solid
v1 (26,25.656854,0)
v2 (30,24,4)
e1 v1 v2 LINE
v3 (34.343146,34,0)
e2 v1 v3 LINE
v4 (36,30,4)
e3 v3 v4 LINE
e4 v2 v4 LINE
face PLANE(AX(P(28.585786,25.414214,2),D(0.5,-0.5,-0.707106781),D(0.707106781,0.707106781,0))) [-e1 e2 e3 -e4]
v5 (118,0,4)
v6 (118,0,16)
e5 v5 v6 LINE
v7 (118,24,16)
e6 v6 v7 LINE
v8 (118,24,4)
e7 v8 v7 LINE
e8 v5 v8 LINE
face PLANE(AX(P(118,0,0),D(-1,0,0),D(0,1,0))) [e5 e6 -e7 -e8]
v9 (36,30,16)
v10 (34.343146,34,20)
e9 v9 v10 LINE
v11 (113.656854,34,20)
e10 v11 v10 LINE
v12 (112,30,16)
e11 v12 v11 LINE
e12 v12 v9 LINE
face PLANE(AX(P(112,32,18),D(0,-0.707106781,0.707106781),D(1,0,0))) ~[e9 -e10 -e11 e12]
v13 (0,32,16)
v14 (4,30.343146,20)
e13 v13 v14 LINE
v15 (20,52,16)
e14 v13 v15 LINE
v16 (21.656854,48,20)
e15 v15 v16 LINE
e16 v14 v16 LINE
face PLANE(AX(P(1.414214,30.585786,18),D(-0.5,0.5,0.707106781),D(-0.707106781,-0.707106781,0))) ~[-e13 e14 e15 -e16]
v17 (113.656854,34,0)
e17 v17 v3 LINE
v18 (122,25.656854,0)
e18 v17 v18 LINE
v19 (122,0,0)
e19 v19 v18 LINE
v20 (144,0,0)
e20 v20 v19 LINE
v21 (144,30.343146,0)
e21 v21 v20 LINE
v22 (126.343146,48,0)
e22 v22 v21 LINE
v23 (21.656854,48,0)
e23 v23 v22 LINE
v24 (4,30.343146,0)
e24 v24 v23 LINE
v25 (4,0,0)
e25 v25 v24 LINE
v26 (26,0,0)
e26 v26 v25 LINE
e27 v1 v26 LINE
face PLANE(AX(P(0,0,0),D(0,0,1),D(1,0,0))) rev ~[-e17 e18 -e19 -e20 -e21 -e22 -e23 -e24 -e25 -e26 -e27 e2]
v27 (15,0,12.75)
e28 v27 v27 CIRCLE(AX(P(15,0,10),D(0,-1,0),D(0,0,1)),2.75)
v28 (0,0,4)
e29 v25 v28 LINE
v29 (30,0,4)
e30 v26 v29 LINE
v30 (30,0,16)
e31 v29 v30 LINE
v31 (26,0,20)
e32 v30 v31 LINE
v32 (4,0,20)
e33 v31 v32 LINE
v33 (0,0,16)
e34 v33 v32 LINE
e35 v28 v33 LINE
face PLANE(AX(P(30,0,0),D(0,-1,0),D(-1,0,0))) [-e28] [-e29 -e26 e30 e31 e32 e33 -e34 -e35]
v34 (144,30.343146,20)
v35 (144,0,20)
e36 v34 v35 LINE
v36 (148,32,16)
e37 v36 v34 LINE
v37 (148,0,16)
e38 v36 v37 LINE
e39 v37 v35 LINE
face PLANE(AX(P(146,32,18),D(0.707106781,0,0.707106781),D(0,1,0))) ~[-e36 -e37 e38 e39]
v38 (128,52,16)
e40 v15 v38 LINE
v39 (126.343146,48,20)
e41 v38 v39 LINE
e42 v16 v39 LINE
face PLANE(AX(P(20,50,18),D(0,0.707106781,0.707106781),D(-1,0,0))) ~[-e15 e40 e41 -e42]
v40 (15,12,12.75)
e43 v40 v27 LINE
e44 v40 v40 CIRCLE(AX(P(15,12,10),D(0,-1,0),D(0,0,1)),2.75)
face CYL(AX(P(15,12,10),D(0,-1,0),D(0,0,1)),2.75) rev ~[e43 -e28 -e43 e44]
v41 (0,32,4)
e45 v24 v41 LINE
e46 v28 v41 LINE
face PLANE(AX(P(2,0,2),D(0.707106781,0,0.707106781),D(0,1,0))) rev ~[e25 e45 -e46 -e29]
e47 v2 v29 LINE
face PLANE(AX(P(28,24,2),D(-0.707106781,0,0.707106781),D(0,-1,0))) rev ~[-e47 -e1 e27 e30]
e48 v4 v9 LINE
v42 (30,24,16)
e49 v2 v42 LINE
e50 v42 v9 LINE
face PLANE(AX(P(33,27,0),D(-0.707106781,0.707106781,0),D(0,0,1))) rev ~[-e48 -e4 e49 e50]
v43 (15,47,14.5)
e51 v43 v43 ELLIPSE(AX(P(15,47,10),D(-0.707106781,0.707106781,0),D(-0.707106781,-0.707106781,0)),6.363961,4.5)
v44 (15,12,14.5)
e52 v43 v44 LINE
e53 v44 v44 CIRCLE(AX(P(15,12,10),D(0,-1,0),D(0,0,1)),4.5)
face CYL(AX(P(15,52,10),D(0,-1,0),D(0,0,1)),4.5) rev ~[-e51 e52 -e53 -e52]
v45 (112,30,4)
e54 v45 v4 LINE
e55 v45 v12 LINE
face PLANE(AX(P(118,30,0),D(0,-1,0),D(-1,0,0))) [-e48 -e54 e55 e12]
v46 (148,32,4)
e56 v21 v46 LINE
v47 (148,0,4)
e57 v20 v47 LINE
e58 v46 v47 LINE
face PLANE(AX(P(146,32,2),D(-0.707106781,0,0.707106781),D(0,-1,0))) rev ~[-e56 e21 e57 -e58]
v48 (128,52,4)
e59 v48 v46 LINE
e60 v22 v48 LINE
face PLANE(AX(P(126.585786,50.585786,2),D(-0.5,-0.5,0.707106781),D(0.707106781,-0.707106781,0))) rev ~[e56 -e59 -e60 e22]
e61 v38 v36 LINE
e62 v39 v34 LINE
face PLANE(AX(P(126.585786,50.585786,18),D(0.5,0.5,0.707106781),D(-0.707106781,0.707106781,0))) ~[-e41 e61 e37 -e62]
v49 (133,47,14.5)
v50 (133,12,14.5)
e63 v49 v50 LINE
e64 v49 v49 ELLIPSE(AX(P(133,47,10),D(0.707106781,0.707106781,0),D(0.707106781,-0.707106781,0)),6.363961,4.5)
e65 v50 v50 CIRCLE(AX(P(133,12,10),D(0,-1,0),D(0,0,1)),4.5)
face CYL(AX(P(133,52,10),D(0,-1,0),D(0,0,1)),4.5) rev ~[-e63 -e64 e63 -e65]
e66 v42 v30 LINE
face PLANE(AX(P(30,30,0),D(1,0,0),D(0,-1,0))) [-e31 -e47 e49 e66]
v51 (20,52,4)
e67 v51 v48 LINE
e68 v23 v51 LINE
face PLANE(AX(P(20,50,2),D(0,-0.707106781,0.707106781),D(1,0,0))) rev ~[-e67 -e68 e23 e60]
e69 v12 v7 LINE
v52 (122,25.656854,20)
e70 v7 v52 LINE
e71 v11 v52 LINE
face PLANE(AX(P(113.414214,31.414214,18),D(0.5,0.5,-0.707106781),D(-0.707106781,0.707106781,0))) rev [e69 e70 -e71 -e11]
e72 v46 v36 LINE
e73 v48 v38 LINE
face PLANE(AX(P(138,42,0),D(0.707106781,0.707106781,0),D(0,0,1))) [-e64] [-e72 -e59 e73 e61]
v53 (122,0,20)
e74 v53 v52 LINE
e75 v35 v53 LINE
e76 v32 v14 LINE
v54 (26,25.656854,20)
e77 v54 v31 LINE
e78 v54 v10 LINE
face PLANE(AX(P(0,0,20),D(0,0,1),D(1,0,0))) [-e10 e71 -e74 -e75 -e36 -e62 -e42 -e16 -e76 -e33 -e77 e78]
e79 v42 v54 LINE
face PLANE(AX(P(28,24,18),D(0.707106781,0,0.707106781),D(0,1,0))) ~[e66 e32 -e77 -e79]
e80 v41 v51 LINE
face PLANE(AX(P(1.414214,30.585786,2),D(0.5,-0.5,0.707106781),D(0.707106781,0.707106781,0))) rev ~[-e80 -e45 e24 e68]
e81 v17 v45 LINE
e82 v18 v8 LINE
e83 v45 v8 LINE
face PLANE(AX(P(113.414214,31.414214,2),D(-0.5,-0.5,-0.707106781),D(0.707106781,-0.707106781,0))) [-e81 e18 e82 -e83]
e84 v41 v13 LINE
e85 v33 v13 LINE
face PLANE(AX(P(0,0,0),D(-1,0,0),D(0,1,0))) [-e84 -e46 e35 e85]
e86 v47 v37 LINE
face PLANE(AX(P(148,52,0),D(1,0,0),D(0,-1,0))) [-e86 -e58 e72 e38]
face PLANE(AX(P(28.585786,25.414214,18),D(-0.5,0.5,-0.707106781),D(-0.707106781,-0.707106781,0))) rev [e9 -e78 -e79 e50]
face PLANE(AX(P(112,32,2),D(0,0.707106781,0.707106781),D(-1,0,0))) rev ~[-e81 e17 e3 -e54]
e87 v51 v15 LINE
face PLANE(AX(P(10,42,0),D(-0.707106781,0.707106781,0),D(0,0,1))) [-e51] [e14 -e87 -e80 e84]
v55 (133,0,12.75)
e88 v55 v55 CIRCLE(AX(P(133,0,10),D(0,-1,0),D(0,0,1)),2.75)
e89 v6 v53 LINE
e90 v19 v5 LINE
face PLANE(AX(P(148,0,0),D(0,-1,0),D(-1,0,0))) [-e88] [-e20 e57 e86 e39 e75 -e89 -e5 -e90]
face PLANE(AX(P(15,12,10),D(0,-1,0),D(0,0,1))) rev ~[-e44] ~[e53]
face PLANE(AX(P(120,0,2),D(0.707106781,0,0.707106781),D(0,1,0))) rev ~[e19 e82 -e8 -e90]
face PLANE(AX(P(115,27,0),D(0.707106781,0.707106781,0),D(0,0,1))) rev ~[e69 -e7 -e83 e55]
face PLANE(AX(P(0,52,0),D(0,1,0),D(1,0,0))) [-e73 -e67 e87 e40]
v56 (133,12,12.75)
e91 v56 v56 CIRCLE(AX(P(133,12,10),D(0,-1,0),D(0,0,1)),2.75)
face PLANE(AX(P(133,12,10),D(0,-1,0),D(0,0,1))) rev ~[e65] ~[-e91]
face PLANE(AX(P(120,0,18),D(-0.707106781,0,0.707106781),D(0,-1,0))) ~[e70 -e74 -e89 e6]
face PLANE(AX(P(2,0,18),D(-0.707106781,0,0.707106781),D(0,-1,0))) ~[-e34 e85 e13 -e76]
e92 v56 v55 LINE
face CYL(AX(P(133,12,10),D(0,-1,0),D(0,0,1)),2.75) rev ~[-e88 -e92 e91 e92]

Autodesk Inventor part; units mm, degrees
ref_plane "YZ Plane" through (0, 0, 0) normal (1, 0, 0) x (0, 1, 0)
ref_plane "XZ Plane" through (0, 0, 0) normal (0, 1, 0) x (-1, 0, 0)
ref_plane "XY Plane" through (0, 0, 0) normal (0, 0, 1) x (1, 0, 0)
sketch "Sketch1" plane through (0, 0, 0) normal (0, 0, 1) x (1, 0, 0)
  line L0 (0, 0) -> (0, 52)
  line L1 (0, 52) -> (148, 52)
  line L2 (148, 52) -> (148, 0)
  line L3 (148, 0) -> (118, 0)
  line L4 (118, 0) -> (118, 30)
  line L5 (118, 30) -> (30, 30)
  line L6 (30, 30) -> (30, 0)
  line L7 (30, 0) -> (0, 0)
  dimension "d0" = 52
  dimension "d1" = 88
  dimension "d2" = 30
  dimension "d3" = 30
extrude "Extrusion1" add sketch "Sketch1" along normal blind 20
chamfer "Chamfer1" distance 20 angle 45 2 edges at (0, 52, 10) (148, 52, 10)
chamfer "Chamfer4" distance 6 angle 45 2 edges at (118, 30, 10) (30, 30, 10)
sketch "Sketch3" plane through (20, 52, 0) normal (0, 1, 0) x (1, 0, 0)
  line L0 (-20, -20) -> (0, -20) projected
  line L1 (0, -20) -> (0, 0) projected
  line L2 (0, 0) -> (-20, 0) projected
  line L3 (-20, 0) -> (-20, -20) projected
  line L4 (108, -20) -> (128, -20) projected
  line L5 (128, -20) -> (128, 0) projected
  line L6 (128, 0) -> (108, 0) projected
  line L7 (108, 0) -> (108, -20) projected
  line L8 (10, 0) -> (-20, 0) projected
  line L9 (10, 0) -> (10, -20) projected
  line L10 (-20, -20) -> (10, -20) projected
  line L11 (-20, 0) -> (-20, -20) projected
  line L12 (128, 0) -> (98, 0) projected
  line L13 (128, 0) -> (128, -20) projected
  line L14 (98, -20) -> (128, -20) projected
  line L15 (98, 0) -> (98, -20) projected
  point P0 (-5, -10)
  point P1 (113, -10)
  dimension "d25" = 15
  dimension "d26" = 10
  dimension "d27" = 15
hole "Hole2" at (15, 52, 10) at (133, 52, 10) direction (0, -1, 0) diameter 5.5 end through all counterbore diameter 9 counterbore depth 40
chamfer "Chamfer3" distance 4 angle 45 20 edges at (74, 52, 20) (10, 42, 20) (0, 16, 20) (138, 42, 20) (148, 16, 20) (138, 42, 0) (148, 16, 0) (74, 52, 0) (10, 42, 0) (0, 16, 0) (30, 12, 0) (74, 30, 0) (118, 12, 0) (74, 30, 20) (30, 12, 20) (118, 12, 20) (115, 27, 0) (33, 27, 0) (33, 27, 20) (115, 27, 20)
properties part number "FrameHandle" material "ABS Plastic"
